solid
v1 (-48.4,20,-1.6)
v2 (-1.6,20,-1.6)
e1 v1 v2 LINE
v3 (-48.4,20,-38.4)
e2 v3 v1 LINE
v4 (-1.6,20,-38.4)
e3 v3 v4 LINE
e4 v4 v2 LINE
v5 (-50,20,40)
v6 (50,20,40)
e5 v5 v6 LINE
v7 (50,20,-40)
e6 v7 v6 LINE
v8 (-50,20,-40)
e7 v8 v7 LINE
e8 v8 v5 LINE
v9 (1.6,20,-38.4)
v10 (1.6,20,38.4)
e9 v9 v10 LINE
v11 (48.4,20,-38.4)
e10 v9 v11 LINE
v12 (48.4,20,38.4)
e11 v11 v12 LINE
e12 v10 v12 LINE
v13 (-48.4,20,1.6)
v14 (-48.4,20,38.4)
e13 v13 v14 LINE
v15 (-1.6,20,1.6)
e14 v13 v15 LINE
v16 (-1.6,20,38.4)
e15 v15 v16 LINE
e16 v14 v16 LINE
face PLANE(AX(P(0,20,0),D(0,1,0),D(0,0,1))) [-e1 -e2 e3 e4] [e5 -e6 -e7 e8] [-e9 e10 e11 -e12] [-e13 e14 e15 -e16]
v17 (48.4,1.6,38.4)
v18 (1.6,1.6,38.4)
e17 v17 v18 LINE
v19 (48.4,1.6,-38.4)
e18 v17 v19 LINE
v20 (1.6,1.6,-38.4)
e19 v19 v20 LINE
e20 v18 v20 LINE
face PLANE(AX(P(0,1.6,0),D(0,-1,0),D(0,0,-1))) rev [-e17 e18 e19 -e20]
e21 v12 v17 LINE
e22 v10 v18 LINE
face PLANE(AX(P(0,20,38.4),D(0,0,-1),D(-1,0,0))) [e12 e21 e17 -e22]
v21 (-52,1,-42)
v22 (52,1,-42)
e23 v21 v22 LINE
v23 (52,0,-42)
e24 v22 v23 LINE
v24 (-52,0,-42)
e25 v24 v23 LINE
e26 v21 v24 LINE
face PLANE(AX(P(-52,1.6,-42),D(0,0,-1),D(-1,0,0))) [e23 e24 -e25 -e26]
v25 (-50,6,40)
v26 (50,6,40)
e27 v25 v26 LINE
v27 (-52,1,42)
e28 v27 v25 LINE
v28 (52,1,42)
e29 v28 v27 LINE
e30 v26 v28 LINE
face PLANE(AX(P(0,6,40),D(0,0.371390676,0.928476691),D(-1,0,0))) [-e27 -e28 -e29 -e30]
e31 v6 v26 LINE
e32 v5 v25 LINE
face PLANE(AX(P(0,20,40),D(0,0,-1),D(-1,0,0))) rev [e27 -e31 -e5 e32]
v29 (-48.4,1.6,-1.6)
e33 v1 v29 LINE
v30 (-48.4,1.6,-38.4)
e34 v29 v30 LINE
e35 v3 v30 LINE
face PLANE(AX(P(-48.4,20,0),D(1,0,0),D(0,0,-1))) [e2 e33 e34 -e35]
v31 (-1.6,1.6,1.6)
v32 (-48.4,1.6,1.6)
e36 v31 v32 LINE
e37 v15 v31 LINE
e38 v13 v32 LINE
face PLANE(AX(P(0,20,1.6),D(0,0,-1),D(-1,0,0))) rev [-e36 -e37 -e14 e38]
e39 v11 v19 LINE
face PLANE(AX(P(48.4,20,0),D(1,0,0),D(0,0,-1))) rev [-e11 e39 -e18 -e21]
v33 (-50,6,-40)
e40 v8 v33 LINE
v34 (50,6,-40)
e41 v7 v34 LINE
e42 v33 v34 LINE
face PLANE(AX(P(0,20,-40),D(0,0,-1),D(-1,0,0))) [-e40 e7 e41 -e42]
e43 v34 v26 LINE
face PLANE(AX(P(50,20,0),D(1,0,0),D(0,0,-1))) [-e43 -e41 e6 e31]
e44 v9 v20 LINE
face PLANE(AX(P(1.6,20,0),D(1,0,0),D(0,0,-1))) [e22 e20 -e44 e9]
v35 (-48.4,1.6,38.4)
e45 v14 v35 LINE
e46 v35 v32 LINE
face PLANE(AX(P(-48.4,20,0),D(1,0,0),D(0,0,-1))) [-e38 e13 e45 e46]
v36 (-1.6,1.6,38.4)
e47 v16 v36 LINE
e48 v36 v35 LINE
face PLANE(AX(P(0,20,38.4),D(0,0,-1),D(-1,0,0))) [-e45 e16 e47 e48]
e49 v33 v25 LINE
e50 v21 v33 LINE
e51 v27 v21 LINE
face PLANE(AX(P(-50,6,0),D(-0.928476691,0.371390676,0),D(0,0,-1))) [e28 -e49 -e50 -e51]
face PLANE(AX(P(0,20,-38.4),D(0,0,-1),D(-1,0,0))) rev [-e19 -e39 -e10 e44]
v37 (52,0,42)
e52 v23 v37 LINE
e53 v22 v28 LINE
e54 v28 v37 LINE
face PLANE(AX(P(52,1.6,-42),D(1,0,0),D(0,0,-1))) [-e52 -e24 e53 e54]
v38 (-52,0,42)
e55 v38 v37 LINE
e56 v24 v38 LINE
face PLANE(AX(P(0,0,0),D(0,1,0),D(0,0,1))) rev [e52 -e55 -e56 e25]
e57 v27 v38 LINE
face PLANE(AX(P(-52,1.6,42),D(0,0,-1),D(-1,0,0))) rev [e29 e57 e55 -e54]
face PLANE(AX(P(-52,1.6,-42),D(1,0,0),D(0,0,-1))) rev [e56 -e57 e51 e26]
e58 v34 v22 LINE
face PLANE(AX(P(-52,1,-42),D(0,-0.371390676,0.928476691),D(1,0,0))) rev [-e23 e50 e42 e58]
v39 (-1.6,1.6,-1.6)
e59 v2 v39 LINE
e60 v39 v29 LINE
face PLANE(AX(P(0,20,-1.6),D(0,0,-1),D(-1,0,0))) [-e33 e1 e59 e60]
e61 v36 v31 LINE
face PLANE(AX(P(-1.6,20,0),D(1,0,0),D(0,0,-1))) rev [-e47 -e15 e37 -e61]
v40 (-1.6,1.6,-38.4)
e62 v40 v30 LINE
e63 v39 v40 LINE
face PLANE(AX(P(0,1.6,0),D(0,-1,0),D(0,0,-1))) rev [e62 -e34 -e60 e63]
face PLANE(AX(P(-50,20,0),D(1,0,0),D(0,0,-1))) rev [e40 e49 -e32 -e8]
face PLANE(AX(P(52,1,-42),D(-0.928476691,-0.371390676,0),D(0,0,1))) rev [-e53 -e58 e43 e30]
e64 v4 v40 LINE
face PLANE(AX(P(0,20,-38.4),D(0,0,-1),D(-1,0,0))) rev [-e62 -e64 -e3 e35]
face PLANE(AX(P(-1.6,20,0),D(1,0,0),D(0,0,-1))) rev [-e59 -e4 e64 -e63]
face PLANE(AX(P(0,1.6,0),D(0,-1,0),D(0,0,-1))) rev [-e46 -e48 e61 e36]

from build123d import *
from OCP.BRepFilletAPI import BRepFilletAPI_MakeChamfer

# Parameters (mm, degrees)
SKICA1_W                = 100
SKICA1_H                = 80
SKICA1_W_2              = 46.8
SKICA1_H_2              = 36.8
SKICA1_H_3              = 76.8
P_IDAT_VYSUNUT_M1_DEPTH = 20
SKICA1_6_W              = 104
SKICA1_6_H              = 84
P_IDAT_VYSUNUT_M3_DEPTH = 1.6
SKICA1_7_W              = 104
SKICA1_7_H              = 84
SKICA1_7_W_2            = 100
SKICA1_7_H_2            = 80
P_IDAT_VYSUNUT_M4_DEPTH = 6
ZKOSEN_14_SIZE          = 2
ZKOSEN_14_SIZE_2        = 5


with BuildPart() as part:
    # Skica1 → Přidat vysunutím1 (new body)
    with BuildSketch(Plane(origin=(0, 0, 0), x_dir=(1, 0, 0), z_dir=(0, 1, 0))):
        Rectangle(SKICA1_W, SKICA1_H)
        with Locations((-25, 20)):
            Rectangle(SKICA1_W_2, SKICA1_H_2, mode=Mode.SUBTRACT)
        with Locations((-25, -20)):
            Rectangle(SKICA1_W_2, SKICA1_H_2, mode=Mode.SUBTRACT)
        with Locations((25, 0)):
            Rectangle(SKICA1_W_2, SKICA1_H_3, mode=Mode.SUBTRACT)
    extrude(amount=P_IDAT_VYSUNUT_M1_DEPTH)

    # Skica1<6> → Přidat vysunutím3 (add)
    with BuildSketch(Plane(origin=(0, 0, 0), x_dir=(1, 0, 0), z_dir=(0, 1, 0))):
        Rectangle(SKICA1_6_W, SKICA1_6_H)
    extrude(amount=P_IDAT_VYSUNUT_M3_DEPTH)

    # Skica1<7> → Přidat vysunutím4 (add)
    with BuildSketch(Plane(origin=(0, 0, 0), x_dir=(1, 0, 0), z_dir=(0, 1, 0))):
        Rectangle(SKICA1_7_W, SKICA1_7_H)
        Rectangle(SKICA1_7_W_2, SKICA1_7_H_2, mode=Mode.SUBTRACT)
    extrude(amount=P_IDAT_VYSUNUT_M4_DEPTH)

    # Zkosení14
    zkosen_14_edges_1 = [part.edges().sort_by_distance(p)[0] for p in [
        (52, 6, 0),
    ]]
    zkosen_14_side_1 = [part.faces().sort_by_distance(p)[0] for p in [
        (51.96, 6, 0),
    ]]
    zkosen_14_edges_2 = [part.edges().sort_by_distance(p)[0] for p in [
        (0, 6, -42),
    ]]
    zkosen_14_side_2 = [part.faces().sort_by_distance(p)[0] for p in [
        (0, 6, -41.96),
    ]]
    zkosen_14_edges_3 = [part.edges().sort_by_distance(p)[0] for p in [
        (-52, 6, 0),
    ]]
    zkosen_14_side_3 = [part.faces().sort_by_distance(p)[0] for p in [
        (-52, 5.96, 0),
    ]]
    zkosen_14_edges_4 = [part.edges().sort_by_distance(p)[0] for p in [
        (0, 6, 42),
    ]]
    zkosen_14_side_4 = [part.faces().sort_by_distance(p)[0] for p in [
        (0, 6, 41.96),
    ]]
    zkosen_14 = BRepFilletAPI_MakeChamfer(part.part.solid().wrapped)
    for e in zkosen_14_edges_1:
        zkosen_14.Add(ZKOSEN_14_SIZE - 0.0001, ZKOSEN_14_SIZE_2 - 0.0001, e.wrapped, zkosen_14_side_1[0].wrapped)
    for e in zkosen_14_edges_2:
        zkosen_14.Add(ZKOSEN_14_SIZE - 0.0001, ZKOSEN_14_SIZE_2 - 0.0001, e.wrapped, zkosen_14_side_2[0].wrapped)
    for e in zkosen_14_edges_3:
        zkosen_14.Add(ZKOSEN_14_SIZE_2 - 0.0001, ZKOSEN_14_SIZE - 0.0001, e.wrapped, zkosen_14_side_3[0].wrapped)
    for e in zkosen_14_edges_4:
        zkosen_14.Add(ZKOSEN_14_SIZE - 0.0001, ZKOSEN_14_SIZE_2 - 0.0001, e.wrapped, zkosen_14_side_4[0].wrapped)
    add(Compound.cast(zkosen_14.Shape()), mode=Mode.REPLACE)  # a hair under: the kernel refuses the full size


solid = part.part
